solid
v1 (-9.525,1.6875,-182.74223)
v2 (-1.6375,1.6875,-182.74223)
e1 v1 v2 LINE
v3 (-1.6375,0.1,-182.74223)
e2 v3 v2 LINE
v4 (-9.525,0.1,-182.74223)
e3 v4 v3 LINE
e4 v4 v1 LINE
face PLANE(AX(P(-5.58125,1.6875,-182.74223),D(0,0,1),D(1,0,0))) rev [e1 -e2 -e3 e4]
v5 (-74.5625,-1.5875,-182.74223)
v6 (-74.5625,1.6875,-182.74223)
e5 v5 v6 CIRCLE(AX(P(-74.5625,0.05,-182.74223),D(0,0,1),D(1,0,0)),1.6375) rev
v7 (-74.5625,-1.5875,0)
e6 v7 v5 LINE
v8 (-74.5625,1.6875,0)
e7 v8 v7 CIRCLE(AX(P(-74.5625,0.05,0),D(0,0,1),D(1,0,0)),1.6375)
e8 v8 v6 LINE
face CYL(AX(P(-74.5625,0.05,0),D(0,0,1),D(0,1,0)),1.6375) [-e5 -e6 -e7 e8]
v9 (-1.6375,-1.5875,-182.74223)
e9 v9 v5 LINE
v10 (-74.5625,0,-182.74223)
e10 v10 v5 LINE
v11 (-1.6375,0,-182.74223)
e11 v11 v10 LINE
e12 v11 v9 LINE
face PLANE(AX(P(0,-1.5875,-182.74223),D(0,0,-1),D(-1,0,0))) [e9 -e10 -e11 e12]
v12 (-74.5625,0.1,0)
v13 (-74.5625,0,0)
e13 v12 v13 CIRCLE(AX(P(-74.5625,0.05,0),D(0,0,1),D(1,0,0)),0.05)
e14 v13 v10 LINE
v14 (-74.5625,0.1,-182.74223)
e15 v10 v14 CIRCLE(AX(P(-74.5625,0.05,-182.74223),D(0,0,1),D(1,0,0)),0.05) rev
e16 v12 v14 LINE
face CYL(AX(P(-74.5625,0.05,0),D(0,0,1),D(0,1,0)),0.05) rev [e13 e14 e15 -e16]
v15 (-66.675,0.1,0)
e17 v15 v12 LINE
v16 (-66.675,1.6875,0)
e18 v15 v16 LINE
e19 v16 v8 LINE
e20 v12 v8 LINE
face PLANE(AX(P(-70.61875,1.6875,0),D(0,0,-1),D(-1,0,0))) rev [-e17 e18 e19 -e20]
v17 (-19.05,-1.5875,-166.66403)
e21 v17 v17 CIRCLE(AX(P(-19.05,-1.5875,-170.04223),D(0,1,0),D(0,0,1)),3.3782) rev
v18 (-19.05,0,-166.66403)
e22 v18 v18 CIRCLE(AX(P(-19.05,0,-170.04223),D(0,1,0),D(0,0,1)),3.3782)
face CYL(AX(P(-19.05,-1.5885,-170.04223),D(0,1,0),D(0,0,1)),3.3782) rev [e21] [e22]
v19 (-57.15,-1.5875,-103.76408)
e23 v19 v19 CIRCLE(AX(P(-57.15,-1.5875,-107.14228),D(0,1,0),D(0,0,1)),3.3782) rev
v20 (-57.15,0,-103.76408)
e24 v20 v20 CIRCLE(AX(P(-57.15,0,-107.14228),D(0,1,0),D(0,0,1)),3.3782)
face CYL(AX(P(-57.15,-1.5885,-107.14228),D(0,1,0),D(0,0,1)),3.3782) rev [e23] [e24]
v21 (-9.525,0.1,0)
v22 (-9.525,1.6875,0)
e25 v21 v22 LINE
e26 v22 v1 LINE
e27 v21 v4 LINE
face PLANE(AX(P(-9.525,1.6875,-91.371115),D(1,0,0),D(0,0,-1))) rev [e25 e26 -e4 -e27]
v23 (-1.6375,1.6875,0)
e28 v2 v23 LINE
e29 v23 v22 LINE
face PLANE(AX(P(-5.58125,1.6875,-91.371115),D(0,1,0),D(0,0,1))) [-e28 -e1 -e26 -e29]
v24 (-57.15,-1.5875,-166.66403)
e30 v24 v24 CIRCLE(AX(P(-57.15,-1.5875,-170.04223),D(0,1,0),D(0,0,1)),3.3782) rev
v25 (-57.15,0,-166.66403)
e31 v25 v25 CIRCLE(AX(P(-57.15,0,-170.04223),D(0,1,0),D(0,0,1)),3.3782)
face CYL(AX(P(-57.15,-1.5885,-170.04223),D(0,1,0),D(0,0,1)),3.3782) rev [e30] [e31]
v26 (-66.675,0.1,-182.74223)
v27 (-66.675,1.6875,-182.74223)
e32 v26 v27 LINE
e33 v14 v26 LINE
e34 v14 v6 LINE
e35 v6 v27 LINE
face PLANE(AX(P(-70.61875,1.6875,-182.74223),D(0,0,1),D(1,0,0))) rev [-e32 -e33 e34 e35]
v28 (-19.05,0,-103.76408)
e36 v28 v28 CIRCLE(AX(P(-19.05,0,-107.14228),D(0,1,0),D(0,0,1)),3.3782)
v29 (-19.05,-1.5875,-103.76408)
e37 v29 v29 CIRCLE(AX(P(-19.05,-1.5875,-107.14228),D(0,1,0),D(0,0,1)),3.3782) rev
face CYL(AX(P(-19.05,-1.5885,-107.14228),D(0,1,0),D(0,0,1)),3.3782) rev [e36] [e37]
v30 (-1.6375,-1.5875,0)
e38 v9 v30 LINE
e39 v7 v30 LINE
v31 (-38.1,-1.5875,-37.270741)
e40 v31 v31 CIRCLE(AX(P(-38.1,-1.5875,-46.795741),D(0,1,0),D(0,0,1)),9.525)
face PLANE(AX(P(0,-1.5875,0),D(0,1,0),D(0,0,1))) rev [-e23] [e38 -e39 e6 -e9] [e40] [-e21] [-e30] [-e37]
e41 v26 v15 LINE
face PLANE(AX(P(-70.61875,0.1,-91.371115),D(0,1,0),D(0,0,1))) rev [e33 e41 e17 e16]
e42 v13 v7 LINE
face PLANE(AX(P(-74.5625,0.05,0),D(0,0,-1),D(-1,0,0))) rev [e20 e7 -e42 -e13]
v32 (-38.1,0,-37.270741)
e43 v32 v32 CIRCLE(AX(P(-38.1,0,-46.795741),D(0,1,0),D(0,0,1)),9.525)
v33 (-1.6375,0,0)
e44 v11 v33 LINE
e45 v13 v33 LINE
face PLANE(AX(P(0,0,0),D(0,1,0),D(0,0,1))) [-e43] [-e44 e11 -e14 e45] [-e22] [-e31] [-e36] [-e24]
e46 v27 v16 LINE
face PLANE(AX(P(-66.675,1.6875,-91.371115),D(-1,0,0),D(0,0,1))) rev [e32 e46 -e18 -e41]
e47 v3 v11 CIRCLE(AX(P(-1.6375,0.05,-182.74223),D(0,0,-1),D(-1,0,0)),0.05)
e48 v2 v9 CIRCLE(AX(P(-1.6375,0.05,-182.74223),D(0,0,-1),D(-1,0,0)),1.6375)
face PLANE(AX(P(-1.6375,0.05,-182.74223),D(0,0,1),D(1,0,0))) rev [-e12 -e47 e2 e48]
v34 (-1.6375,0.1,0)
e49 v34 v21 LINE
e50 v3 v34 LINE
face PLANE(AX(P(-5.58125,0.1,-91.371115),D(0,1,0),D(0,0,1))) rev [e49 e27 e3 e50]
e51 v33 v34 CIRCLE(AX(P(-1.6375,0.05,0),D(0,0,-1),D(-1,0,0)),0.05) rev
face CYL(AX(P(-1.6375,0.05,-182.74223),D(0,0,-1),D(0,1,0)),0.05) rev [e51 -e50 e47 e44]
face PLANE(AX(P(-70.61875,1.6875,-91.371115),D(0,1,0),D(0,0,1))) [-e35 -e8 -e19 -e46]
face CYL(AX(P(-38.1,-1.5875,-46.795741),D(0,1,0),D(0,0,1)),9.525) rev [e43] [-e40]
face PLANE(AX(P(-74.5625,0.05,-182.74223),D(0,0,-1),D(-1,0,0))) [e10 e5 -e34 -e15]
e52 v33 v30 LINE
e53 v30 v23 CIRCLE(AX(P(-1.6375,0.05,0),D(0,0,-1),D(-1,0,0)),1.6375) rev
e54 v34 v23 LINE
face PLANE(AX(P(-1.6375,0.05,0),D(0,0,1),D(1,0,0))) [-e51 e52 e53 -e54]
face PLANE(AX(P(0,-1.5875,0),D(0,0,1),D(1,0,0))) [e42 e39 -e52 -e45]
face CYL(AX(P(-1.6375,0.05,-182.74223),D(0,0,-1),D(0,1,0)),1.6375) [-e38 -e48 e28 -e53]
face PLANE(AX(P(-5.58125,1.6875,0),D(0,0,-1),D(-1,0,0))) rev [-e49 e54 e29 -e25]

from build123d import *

# Parameters (mm, degrees)
SKETCH1_W          = 76.2
SKETCH1_H          = 182.7422304
BASE_FLANGE1_DEPTH = 1.5875
CUT_EXTRUDE1_REACH = 199.999
SKETCH6_R          = 3.3782
SKETCH7_R          = 9.525
CUT_EXTRUDE2_DEPTH = 198.999199311
HEM1_START         = -182.7422304
HEM1_DEPTH         = 182.7422304
HEM1_2_DEPTH       = 182.7422304


# Read off the part's stored shape, not the designer's step: Hem1
# Sheet-metal steps are written as plain solids
with BuildPart() as part:
    # Sketch1 → Base-Flange1 (new body)
    with BuildSketch(Plane(origin=(0, 0, 0), x_dir=(1, 0, 0), z_dir=(0, 1, 0))):
        with Locations((-38.1, 91.3711152)):
            Rectangle(SKETCH1_W, SKETCH1_H)
    extrude(amount=-BASE_FLANGE1_DEPTH)

    # Sketch6 → Cut-Extrude1 (cut, up to next)
    with BuildSketch(Plane(origin=(0, 0, 0), x_dir=(1, 0, 0), z_dir=(0, 1, 0)), mode=Mode.PRIVATE) as cut_extrude1_sk1:
        with Locations(Location((-57.15, 170.0422304, 0), (0, 0, 270))):
            Circle(SKETCH6_R)
    cut_extrude1_tool1 = extrude(cut_extrude1_sk1.sketch, amount=-CUT_EXTRUDE1_REACH, mode=Mode.PRIVATE) & part.part
    # Sketch6 → Cut-Extrude1 (cut, up to next)
    with BuildSketch(Plane(origin=(0, 0, 0), x_dir=(1, 0, 0), z_dir=(0, 1, 0)), mode=Mode.PRIVATE) as cut_extrude1_sk2:
        with Locations(Location((-19.05, 170.0422304, 0), (0, 0, 270))):
            Circle(SKETCH6_R)
    cut_extrude1_tool2 = extrude(cut_extrude1_sk2.sketch, amount=-CUT_EXTRUDE1_REACH, mode=Mode.PRIVATE) & part.part
    # Sketch6 → Cut-Extrude1 (cut, up to next)
    with BuildSketch(Plane(origin=(0, 0, 0), x_dir=(1, 0, 0), z_dir=(0, 1, 0)), mode=Mode.PRIVATE) as cut_extrude1_sk3:
        with Locations(Location((-19.05, 107.14228, 0), (0, 0, 270))):
            Circle(SKETCH6_R)
    cut_extrude1_tool3 = extrude(cut_extrude1_sk3.sketch, amount=-CUT_EXTRUDE1_REACH, mode=Mode.PRIVATE) & part.part
    # Sketch6 → Cut-Extrude1 (cut, up to next)
    with BuildSketch(Plane(origin=(0, 0, 0), x_dir=(1, 0, 0), z_dir=(0, 1, 0)), mode=Mode.PRIVATE) as cut_extrude1_sk4:
        with Locations(Location((-57.15, 107.14228, 0), (0, 0, 270))):
            Circle(SKETCH6_R)
    cut_extrude1_tool4 = extrude(cut_extrude1_sk4.sketch, amount=-CUT_EXTRUDE1_REACH, mode=Mode.PRIVATE) & part.part
    add(cut_extrude1_tool1.solids().sort_by_distance((-57.15, 0, -170.04223))[0], mode=Mode.SUBTRACT)
    add(cut_extrude1_tool2.solids().sort_by_distance((-19.05, 0, -170.04223))[0], mode=Mode.SUBTRACT)
    add(cut_extrude1_tool3.solids().sort_by_distance((-19.05, 0, -107.14228))[0], mode=Mode.SUBTRACT)
    add(cut_extrude1_tool4.solids().sort_by_distance((-57.15, 0, -107.14228))[0], mode=Mode.SUBTRACT)

    # Sketch7 → Cut-Extrude2 (cut, through all)
    with BuildSketch(Plane(origin=(0, 0, 0), x_dir=(1, 0, 0), z_dir=(0, 1, 0))):
        with Locations(Location((-38.1, 46.7957408, 0), (0, 0, 270))):
            Circle(SKETCH7_R)
    extrude(amount=-CUT_EXTRUDE2_DEPTH, mode=Mode.SUBTRACT)

    # Hem1 outline → Hem1 (cut)
    with BuildSketch(Plane.XY.offset(HEM1_START)):
        with BuildLine():
            ThreePointArc((-74.5625, -1.5875), (-75.70257264, -1.125432101), (-76.199236463, 0))
            Line((-76.199236463, 0), (-76.2, 0))
            Line((-76.2, 0), (-76.2, -1.5875))
            Line((-76.2, -1.5875), (-74.5625, -1.5875))
        make_face()
        with BuildLine():
            ThreePointArc((-0.000763537, 0), (-0.49742736, -1.125432101), (-1.6375, -1.5875))
            Line((-1.6375, -1.5875), (0, -1.5875))
            Line((0, -1.5875), (0, 0))
            Line((0, 0), (-0.000763537, 0))
        make_face()
    extrude(amount=HEM1_DEPTH, mode=Mode.SUBTRACT)

    # Hem1 2 outline → Hem1 2 (add)
    with BuildSketch(Plane.XY.offset(HEM1_START)):
        with BuildLine():
            Line((-66.675, 0.1), (-66.675, 1.6875))
            Line((-66.675, 1.6875), (-74.5625, 1.6875))
            ThreePointArc((-74.5625, 1.6875), (-75.737932101, 1.19007264), (-76.199236463, 0))
            Line((-76.199236463, 0), (-74.5625, 0))
            ThreePointArc((-74.5625, 0), (-74.6125, 0.05), (-74.5625, 0.1))
            Line((-74.5625, 0.1), (-66.675, 0.1))
        make_face()
        with BuildLine():
            ThreePointArc((-1.6375, 0.1), (-1.5875, 0.05), (-1.6375, 0))
            Line((-1.6375, 0), (-0.000763537, 0))
            ThreePointArc((-0.000763537, 0), (-0.462067899, 1.19007264), (-1.6375, 1.6875))
            Line((-1.6375, 1.6875), (-9.525, 1.6875))
            Line((-9.525, 1.6875), (-9.525, 0.1))
            Line((-9.525, 0.1), (-1.6375, 0.1))
        make_face()
    extrude(amount=HEM1_2_DEPTH)


solid = part.part
